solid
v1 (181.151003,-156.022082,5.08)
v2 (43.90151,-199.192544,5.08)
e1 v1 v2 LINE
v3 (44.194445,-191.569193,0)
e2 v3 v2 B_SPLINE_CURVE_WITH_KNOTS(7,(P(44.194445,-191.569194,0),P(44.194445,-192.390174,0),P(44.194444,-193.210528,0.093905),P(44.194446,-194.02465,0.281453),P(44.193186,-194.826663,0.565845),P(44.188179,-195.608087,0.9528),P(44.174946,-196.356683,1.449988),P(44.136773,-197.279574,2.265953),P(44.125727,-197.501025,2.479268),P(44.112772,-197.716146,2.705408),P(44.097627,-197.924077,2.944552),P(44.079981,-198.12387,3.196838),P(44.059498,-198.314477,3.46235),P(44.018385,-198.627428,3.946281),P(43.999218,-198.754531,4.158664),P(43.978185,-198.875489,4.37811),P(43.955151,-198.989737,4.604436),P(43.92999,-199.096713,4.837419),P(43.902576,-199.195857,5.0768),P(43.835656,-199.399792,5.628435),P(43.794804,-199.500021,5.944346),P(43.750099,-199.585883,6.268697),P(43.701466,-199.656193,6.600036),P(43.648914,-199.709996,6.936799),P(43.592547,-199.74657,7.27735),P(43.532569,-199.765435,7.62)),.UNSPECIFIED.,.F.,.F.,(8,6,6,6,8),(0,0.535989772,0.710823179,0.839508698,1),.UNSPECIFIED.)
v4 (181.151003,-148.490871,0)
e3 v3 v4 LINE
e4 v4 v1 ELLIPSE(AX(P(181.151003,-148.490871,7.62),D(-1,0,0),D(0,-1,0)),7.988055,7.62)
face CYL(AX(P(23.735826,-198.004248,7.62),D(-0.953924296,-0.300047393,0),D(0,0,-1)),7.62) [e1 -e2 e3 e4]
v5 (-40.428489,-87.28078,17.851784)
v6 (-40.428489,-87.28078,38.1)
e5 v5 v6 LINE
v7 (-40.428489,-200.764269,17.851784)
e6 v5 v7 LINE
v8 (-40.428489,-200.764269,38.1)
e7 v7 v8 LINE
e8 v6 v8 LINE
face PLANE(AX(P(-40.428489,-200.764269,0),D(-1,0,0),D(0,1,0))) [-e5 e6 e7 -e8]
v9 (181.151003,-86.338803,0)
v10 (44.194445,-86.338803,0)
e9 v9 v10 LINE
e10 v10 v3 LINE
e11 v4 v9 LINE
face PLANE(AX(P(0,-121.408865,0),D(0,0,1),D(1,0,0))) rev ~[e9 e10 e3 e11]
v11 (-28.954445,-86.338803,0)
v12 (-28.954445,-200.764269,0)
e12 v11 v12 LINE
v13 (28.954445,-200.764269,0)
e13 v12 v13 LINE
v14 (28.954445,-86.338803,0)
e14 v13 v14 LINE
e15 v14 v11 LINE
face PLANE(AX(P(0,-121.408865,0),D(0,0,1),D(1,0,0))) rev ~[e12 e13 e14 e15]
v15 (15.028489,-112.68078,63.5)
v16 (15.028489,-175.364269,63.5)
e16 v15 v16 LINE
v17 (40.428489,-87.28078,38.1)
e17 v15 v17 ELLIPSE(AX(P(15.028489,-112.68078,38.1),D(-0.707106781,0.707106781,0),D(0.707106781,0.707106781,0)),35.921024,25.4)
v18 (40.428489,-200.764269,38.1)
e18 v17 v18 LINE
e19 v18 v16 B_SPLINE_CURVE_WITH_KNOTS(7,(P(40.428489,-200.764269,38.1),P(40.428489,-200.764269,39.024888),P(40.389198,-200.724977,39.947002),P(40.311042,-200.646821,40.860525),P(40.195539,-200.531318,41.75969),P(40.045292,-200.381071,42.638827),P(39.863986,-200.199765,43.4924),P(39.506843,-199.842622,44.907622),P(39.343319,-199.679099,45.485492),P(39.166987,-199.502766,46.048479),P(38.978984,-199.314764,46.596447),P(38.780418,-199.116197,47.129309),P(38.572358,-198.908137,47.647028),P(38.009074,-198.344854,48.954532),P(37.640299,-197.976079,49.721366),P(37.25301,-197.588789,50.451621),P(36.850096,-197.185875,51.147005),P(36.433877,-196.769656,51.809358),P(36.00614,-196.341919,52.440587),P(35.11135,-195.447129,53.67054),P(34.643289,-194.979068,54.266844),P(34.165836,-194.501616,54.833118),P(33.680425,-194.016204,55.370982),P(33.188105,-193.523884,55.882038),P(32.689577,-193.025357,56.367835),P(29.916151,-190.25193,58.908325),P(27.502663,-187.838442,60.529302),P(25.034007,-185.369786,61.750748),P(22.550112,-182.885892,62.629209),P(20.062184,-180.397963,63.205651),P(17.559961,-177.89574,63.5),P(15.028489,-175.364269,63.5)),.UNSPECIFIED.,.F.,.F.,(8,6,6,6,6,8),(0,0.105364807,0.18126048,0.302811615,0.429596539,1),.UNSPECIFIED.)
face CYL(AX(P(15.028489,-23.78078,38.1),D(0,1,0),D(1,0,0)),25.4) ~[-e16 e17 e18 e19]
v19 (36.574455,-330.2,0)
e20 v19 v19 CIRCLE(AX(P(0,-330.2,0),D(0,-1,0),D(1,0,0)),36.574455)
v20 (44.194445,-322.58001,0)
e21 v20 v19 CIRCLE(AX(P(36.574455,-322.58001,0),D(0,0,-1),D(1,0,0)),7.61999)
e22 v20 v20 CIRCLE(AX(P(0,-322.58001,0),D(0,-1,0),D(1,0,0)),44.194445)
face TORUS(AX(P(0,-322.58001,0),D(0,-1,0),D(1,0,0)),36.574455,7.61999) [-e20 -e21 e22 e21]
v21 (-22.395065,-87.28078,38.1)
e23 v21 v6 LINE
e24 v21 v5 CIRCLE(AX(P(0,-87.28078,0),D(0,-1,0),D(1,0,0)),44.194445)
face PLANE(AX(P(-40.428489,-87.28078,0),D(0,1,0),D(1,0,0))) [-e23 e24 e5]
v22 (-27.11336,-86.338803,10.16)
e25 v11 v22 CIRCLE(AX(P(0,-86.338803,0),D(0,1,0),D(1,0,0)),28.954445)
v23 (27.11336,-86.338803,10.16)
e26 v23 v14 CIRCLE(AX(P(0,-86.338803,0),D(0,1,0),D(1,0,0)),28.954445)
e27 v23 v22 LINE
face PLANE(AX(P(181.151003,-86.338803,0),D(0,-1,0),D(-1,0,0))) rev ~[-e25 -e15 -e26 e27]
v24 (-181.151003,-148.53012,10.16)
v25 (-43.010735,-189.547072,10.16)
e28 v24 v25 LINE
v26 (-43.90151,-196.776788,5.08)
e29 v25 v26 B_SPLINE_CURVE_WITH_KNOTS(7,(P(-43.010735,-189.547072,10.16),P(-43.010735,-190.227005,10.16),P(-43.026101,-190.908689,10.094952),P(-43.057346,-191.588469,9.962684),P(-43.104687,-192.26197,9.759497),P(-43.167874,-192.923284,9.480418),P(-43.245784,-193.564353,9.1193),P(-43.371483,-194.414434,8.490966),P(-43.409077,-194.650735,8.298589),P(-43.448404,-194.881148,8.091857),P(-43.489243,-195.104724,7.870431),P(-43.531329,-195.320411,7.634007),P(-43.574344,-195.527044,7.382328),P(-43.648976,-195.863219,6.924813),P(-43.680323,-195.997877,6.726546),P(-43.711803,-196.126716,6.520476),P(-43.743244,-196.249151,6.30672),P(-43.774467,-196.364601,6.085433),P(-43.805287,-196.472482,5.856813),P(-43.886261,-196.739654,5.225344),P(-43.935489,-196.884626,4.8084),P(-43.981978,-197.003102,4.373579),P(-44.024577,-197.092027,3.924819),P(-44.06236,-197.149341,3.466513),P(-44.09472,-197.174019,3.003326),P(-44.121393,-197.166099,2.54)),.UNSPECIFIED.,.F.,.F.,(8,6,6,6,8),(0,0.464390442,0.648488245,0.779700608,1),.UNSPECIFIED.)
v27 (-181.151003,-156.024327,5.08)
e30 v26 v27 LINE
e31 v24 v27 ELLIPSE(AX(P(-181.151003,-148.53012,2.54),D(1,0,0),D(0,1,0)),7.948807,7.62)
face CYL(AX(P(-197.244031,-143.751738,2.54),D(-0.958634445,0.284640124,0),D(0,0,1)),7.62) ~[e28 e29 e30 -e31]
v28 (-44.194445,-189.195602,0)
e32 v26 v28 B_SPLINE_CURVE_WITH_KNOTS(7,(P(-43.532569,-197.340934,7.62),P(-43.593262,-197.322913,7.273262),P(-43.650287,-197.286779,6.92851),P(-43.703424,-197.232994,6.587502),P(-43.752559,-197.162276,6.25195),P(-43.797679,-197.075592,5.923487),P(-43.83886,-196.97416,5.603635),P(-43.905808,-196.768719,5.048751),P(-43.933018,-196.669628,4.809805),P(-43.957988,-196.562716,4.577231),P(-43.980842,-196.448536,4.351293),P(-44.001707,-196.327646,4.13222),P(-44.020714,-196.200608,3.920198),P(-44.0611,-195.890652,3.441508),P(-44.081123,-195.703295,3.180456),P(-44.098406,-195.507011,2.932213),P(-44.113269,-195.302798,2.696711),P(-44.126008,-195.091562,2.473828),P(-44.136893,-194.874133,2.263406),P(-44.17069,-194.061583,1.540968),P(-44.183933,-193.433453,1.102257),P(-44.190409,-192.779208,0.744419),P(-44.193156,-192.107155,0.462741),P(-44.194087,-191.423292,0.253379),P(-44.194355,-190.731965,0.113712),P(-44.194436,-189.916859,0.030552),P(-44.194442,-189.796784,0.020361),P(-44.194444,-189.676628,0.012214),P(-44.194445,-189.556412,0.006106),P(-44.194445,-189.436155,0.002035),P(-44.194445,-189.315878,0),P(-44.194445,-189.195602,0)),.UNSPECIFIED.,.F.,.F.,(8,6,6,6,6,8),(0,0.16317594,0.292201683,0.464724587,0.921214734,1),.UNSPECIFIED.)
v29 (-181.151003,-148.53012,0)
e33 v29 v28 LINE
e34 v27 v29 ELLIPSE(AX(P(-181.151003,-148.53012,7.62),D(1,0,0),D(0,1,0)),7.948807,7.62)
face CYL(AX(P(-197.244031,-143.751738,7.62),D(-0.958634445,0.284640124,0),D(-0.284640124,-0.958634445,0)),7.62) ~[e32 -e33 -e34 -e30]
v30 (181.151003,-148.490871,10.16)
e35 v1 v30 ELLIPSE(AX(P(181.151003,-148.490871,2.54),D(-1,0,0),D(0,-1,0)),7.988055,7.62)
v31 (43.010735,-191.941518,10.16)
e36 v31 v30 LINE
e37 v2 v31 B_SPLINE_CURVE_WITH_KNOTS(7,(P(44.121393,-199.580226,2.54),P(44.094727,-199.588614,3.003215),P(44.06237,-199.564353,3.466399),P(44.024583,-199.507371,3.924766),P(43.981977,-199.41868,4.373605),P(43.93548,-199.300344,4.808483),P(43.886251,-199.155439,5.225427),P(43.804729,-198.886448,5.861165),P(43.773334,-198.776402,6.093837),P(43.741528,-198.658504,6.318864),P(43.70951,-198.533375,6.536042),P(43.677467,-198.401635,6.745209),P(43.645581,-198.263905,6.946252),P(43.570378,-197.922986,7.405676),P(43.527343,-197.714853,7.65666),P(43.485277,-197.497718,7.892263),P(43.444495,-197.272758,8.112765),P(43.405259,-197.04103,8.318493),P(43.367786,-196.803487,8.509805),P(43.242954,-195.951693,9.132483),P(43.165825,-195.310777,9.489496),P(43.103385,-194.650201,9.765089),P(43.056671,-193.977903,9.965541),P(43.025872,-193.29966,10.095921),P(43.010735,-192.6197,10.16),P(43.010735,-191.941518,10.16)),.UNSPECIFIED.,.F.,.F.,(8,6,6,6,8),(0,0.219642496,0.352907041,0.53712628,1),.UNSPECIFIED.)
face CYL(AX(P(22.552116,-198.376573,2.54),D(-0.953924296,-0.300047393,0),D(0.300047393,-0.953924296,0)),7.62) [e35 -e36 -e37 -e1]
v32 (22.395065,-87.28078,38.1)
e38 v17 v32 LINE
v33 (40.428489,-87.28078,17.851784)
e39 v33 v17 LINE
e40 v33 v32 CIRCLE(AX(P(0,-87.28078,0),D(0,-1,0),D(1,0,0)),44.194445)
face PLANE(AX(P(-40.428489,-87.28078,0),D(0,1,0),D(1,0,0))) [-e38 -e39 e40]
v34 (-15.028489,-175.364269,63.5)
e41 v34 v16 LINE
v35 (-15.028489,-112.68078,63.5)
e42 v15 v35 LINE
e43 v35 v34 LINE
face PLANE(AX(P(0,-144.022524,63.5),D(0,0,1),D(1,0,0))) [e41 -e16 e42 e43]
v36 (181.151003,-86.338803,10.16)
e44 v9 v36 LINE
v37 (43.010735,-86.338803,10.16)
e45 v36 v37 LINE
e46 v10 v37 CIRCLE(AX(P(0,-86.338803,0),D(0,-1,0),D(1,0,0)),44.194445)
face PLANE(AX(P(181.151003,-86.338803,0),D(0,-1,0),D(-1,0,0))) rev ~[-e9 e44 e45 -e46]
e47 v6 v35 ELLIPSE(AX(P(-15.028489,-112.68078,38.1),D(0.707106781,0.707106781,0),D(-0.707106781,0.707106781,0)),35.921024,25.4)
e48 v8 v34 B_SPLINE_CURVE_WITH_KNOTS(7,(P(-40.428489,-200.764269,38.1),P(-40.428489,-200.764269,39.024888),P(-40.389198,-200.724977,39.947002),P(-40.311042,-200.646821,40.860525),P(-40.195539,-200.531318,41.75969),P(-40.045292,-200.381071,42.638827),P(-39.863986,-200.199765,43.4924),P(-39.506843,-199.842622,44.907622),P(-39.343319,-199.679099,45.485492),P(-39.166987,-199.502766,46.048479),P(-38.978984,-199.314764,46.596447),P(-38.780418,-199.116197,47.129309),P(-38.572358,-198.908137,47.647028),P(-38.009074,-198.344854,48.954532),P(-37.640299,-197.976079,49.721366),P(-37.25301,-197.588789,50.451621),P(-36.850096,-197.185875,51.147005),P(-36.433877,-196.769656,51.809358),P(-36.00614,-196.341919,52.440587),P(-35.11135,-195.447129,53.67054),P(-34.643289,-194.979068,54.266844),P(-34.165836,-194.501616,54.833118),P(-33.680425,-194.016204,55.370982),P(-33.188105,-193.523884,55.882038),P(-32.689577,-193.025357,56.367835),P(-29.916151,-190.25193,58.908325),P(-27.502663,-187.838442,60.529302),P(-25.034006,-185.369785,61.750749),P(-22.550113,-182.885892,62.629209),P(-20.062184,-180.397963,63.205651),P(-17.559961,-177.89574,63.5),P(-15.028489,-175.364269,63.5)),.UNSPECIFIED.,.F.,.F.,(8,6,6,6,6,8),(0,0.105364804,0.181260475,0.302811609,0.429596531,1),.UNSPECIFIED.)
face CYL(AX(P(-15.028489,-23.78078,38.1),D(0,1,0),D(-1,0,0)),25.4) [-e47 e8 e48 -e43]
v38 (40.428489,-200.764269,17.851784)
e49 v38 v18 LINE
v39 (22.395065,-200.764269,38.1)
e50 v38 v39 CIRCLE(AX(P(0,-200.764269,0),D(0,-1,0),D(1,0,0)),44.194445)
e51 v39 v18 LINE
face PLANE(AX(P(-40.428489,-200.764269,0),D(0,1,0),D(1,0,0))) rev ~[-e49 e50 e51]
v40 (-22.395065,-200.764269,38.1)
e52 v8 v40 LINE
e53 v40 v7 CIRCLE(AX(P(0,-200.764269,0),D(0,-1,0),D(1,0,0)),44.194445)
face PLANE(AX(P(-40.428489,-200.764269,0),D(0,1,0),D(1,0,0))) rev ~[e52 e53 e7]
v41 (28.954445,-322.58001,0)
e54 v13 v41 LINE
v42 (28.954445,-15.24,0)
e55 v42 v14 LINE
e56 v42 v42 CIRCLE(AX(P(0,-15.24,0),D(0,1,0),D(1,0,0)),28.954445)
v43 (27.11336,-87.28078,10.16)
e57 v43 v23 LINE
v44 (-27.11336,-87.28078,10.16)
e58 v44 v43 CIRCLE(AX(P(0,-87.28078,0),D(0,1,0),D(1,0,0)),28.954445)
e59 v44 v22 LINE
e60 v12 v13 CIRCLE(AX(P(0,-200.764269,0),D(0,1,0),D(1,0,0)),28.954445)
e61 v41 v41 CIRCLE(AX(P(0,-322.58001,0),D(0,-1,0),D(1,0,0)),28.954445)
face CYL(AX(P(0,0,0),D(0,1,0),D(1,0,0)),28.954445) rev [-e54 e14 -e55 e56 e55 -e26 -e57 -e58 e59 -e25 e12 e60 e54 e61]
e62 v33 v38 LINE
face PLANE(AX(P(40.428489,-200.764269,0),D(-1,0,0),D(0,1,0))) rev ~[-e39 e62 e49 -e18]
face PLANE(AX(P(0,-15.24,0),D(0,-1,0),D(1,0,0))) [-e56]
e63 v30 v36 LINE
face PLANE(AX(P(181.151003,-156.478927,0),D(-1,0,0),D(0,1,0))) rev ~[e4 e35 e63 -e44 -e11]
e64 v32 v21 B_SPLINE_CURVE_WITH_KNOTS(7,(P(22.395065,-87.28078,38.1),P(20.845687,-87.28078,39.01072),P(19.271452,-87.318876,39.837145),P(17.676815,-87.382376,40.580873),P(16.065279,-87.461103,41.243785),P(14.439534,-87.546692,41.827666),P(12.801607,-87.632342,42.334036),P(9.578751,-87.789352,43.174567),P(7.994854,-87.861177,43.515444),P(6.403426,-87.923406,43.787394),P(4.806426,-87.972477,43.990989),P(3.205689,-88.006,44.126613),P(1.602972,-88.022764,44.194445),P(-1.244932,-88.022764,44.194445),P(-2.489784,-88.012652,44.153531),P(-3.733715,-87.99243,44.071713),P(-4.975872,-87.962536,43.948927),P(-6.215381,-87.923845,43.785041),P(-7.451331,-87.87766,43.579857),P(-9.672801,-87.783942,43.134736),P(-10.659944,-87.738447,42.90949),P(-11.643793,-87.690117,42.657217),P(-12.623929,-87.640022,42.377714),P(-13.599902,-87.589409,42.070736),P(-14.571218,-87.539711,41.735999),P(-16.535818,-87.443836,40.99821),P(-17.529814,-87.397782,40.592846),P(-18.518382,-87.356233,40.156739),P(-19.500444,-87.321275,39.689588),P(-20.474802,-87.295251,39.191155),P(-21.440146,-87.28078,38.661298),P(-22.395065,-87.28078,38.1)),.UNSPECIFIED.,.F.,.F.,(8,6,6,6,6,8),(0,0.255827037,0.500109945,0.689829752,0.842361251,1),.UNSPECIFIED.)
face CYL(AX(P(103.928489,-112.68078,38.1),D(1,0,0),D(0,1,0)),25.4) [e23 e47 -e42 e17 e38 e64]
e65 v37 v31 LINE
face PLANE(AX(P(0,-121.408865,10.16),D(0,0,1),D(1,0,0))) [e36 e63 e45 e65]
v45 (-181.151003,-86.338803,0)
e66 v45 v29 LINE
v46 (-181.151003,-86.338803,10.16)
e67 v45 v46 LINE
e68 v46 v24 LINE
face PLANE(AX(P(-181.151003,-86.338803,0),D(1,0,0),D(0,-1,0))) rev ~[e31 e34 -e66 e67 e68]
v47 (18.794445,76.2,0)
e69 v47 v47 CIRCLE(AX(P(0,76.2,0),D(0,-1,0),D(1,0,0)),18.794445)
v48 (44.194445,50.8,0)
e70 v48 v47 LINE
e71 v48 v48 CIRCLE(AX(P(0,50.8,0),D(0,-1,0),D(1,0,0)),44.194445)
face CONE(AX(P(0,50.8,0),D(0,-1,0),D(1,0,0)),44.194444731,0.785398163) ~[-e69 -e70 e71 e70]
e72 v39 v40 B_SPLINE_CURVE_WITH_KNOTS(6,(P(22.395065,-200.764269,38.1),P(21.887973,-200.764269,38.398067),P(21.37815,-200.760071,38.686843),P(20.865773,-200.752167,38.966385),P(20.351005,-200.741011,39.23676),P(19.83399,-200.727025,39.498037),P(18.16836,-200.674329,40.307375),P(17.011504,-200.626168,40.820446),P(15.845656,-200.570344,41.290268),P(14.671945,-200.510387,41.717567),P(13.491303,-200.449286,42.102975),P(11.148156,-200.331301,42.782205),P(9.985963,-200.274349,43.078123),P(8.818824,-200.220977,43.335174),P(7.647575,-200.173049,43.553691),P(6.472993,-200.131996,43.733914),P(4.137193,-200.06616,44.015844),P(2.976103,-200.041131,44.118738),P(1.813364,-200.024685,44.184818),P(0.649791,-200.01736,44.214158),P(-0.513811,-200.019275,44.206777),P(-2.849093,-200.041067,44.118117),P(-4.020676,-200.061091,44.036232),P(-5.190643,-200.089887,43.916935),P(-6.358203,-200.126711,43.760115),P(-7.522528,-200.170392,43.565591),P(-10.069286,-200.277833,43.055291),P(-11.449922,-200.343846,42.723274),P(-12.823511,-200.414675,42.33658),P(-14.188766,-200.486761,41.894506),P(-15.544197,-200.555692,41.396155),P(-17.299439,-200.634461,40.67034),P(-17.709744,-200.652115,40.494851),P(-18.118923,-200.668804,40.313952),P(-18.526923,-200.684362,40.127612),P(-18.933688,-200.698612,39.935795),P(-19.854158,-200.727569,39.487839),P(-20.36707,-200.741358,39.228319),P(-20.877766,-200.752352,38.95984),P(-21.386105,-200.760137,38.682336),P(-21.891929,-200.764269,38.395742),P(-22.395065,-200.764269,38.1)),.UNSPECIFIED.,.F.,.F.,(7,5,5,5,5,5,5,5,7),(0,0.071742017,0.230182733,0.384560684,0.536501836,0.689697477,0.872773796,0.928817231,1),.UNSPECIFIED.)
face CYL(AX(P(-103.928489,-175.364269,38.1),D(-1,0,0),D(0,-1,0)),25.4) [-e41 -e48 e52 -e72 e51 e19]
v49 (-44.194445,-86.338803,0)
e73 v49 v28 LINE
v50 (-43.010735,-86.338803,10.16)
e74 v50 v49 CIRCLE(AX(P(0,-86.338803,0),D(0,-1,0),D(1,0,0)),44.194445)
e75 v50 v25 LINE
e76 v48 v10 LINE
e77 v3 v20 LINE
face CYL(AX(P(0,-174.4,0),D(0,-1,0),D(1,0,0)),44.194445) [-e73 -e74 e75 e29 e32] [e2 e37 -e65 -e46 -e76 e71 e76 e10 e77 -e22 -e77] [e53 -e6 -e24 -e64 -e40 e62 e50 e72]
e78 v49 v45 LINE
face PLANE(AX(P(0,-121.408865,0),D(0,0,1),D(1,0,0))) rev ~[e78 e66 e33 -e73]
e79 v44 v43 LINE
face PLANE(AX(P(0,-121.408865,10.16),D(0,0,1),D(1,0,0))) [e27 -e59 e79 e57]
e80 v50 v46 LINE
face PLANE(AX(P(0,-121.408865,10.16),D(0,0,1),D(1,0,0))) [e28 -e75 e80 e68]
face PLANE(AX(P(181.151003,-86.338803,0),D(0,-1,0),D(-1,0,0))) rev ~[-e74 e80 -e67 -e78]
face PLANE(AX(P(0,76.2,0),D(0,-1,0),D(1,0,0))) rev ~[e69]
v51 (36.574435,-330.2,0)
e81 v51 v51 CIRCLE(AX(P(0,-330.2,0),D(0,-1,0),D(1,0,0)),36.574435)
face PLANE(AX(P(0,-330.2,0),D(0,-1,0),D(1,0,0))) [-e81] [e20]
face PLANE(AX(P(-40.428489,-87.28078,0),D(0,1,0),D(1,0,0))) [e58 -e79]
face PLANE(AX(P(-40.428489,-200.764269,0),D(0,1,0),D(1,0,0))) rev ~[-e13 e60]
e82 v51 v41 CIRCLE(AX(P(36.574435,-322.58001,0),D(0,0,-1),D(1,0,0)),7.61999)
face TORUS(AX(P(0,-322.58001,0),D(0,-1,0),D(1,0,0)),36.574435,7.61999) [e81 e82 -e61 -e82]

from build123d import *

# Parameters (mm, degrees)
F0_R          = 44.1944447312
F1_DEPTH      = 330.2
F2_T          = -15.24
F3_R          = 7.61999
F4_DEPTH      = 76.2
F5_SIZE       = 25.4
F6_W          = 80.8569788933
F6_H          = 113.4834885597
F7_DEPTH      = 63.5
F8_T1_DEPTH   = 240.4834885597
F8_T6_DEPTH   = 207.8569788933
F8_S7_R       = 44.1944447312
F8_T8_DEPTH   = 107
F8_T12_DEPTH  = 207.8569788933
F8_S13_R      = 44.1944447312
F8_T14_DEPTH  = 107
F10_DEPTH     = 10.16
F11_T4_DEPTH  = 181.6717263284
F11_S5_R      = 44.1944447312
F11_T6_DEPTH  = 95
F11_T10_DEPTH = 182.9126104381
F11_S11_R     = 44.1944447312
F11_T12_DEPTH = 95
F11_T16_DEPTH = 182.201088869
F11_S17_R     = 44.1944447312
F11_T18_DEPTH = 95
F11_T22_DEPTH = 180.9663017132
F11_S23_R     = 44.1944447312
F11_T24_DEPTH = 94


# Not quite as in the source:
# - a fillet or chamfer that OpenCascade refuses, or shapes differently, is made with other operations: its cross-section is extruded or revolved along the edge and cut away or added
# - a fillet or chamfer is up to 0.001 mm smaller than in the source, because OpenCascade refuses the exact size


with BuildPart() as f1:
    # F0 (on Front) → F1 (new body)
    with BuildSketch(Plane.XZ):
        Circle(F0_R)
    extrude(amount=F1_DEPTH)

    # F2
    f2_openings = [f1.faces().sort_by_distance(p)[0] for p in [
        (0, -330.2, 0),
    ]]
    offset(amount=F2_T, openings=f2_openings)

    # F3 (radius 7.62 in the source; OpenCascade refuses exactly that, so slightly less here)
    f3_edges = [f1.edges().sort_by_distance(p)[0] for p in [
        (-44.194445, -330.2, 0),
        (-28.954445, -330.2, 0),
    ]]
    fillet(f3_edges, radius=F3_R)

    # F4 (add): a face of the model
    f4_faces = [f1.faces().sort_by_distance(p)[0] for p in [
        (0, 0, 0),
    ]]
    extrude(f4_faces, amount=F4_DEPTH)

    # F5
    f5_edges = [f1.edges().sort_by_distance(p)[0] for p in [
        (-44.194445, 76.2, 0),
    ]]
    chamfer(f5_edges, length=F5_SIZE)

    # F6 (on Top) → F7 (join)
    with BuildSketch(Plane.XY):
        with Locations((0, -144.0225243568)):
            Rectangle(F6_W, F6_H)
    extrude(amount=F7_DEPTH)

    # F8: fillet of radius 25.4 on 4 edges, made by hand

    # F8_s2 → F8_t1 (cut)
    with BuildSketch(Plane.XZ.offset(23.780780077)):
        with BuildLine():
            ThreePointArc((40.4284894466, 38.1), (32.9890016888, 56.0605122421), (15.0284894466, 63.5))
            Line((15.0284894466, 63.5), (40.4284894466, 63.5))
            Line((40.4284894466, 63.5), (40.4284894466, 38.1))
        make_face()
        with BuildLine():
            ThreePointArc((-40.4284894466, 38.1), (-32.9890016888, 56.0605122421), (-15.0284894466, 63.5))
            Line((-15.0284894466, 63.5), (-40.4284894466, 63.5))
            Line((-40.4284894466, 63.5), (-40.4284894466, 38.1))
        make_face()
    extrude(amount=F8_T1_DEPTH, mode=Mode.SUBTRACT)


with BuildPart() as f8_tool4:
    # F8_s5 → F8_t6 (new body)
    with BuildSketch(Plane.YZ.offset(103.9284894466)):
        with BuildLine():
            ThreePointArc((-87.280780077, 38.1), (-94.7202678348, 56.0605122421), (-112.680780077, 63.5))
            Line((-112.680780077, 63.5), (-87.280780077, 63.5))
            Line((-87.280780077, 63.5), (-87.280780077, 38.1))
        make_face()
    extrude(amount=-F8_T6_DEPTH)

    # F8_s7 → F8_t8 (cut, symmetric)
    with BuildSketch(Plane.XZ.offset(100)):
        Circle(F8_S7_R)
    extrude(amount=F8_T8_DEPTH, both=True, mode=Mode.SUBTRACT)


with BuildPart() as f1_1:
    add(f1.part)

    # F8_t3: cut F8_tool4
    add(f8_tool4.part, mode=Mode.SUBTRACT)


with BuildPart() as f8_tool10:
    # F8_s11 → F8_t12 (new body)
    with BuildSketch(Plane.YZ.offset(-103.9284894466)):
        with BuildLine():
            ThreePointArc((-200.7642686367, 38.1), (-193.3247808788, 56.0605122421), (-175.3642686367, 63.5))
            Line((-175.3642686367, 63.5), (-200.7642686367, 63.5))
            Line((-200.7642686367, 63.5), (-200.7642686367, 38.1))
        make_face()
    extrude(amount=F8_T12_DEPTH)

    # F8_s13 → F8_t14 (cut, symmetric)
    with BuildSketch(Plane.XZ.offset(188.1)):
        Circle(F8_S13_R)
    extrude(amount=F8_T14_DEPTH, both=True, mode=Mode.SUBTRACT)


with BuildPart() as f1_2:
    add(f1_1.part)

    # F8_t9: cut F8_tool10
    add(f8_tool10.part, mode=Mode.SUBTRACT)

    # F9 (on Top) → F10 (join)
    with BuildSketch(Plane.XY):
        Polygon((181.1510026455, -156.4789265394), (181.1510026455, -86.3388031721), (-181.1510026455, -86.3388031721), (-181.1510026455, -156.4789265394), (-40.541768074, -156.4789265394), (40.4533445835, -156.4789265394), align=None)
        Polygon((40.4533445835, -200.733974576), (181.1510026455, -156.4789265394), (40.4533445835, -156.4789265394), align=None)
        Polygon((-40.541768074, -156.4789265394), (-181.1510026455, -156.4789265394), (-40.541768074, -198.22897017), align=None)
    extrude(amount=F10_DEPTH)

    # F11: fillet of radius 7.62 on 4 edges, made by hand


with BuildPart() as f11_tool2:
    # F11_s3 → F11_t4 (new body)
    with BuildSketch(Plane(origin=(-35.0743442089, -11.0322858902, 0), x_dir=(0, 0, 1), z_dir=(0.9539242957, 0.3000473932, 0))):
        with BuildLine():
            ThreePointArc((0, 196.0029358997), (2.2318463274, 201.3910895724), (7.62, 203.6229358997))
            Line((7.62, 203.6229358997), (0, 203.6229358997))
            Line((0, 203.6229358997), (0, 196.0029358997))
        make_face()
    extrude(amount=F11_T4_DEPTH)

    # F11_s5 → F11_t6 (cut, symmetric)
    with BuildSketch(Plane.XZ.offset(174.4)):
        Circle(F11_S5_R)
    extrude(amount=F11_T6_DEPTH, both=True, mode=Mode.SUBTRACT)


with BuildPart() as f1_3:
    add(f1_2.part)

    # F11_t1: cut F11_tool2
    add(f11_tool2.part, mode=Mode.SUBTRACT)


with BuildPart() as f11_tool8:
    # F11_s9 → F11_t10 (new body)
    with BuildSketch(Plane(origin=(-36.2580537092, -11.4046099325, 0), x_dir=(0, 0, 1), z_dir=(0.9539242957, 0.3000473932, 0))):
        with BuildLine():
            ThreePointArc((2.54, 203.6229358997), (7.9281536726, 201.3910895724), (10.16, 196.0029358997))
            Line((10.16, 196.0029358997), (10.16, 203.6229358997))
            Line((10.16, 203.6229358997), (2.54, 203.6229358997))
        make_face()
    extrude(amount=F11_T10_DEPTH)

    # F11_s11 → F11_t12 (cut, symmetric)
    with BuildSketch(Plane.XZ.offset(174.6)):
        Circle(F11_S11_R)
    extrude(amount=F11_T12_DEPTH, both=True, mode=Mode.SUBTRACT)


with BuildPart() as f1_4:
    add(f1_3.part)

    # F11_t7: cut F11_tool8
    add(f11_tool8.part, mode=Mode.SUBTRACT)


with BuildPart() as f11_tool14:
    # F11_s15 → F11_t16 (new body)
    with BuildSketch(Plane(origin=(-142.0383828725, 42.1743898985, 0), x_dir=(0, 0, 1), z_dir=(0.9586344454, -0.2846401237, 0))):
        with BuildLine():
            ThreePointArc((10.16, 193.9489327682), (7.9281536726, 199.3370864408), (2.54, 201.5689327682))
            Line((2.54, 201.5689327682), (10.16, 201.5689327682))
            Line((10.16, 201.5689327682), (10.16, 193.9489327682))
        make_face()
    extrude(amount=F11_T16_DEPTH)

    # F11_s17 → F11_t18 (cut, symmetric)
    with BuildSketch(Plane.XZ.offset(173.3)):
        Circle(F11_S17_R)
    extrude(amount=F11_T18_DEPTH, both=True, mode=Mode.SUBTRACT)


with BuildPart() as f1_5:
    add(f1_4.part)

    # F11_t13: cut F11_tool14
    add(f11_tool14.part, mode=Mode.SUBTRACT)


with BuildPart() as f11_tool20:
    # F11_s21 → F11_t22 (new body)
    with BuildSketch(Plane(origin=(-142.0383828725, 42.1743898985, 0), x_dir=(0, 0, 1), z_dir=(0.9586344454, -0.2846401237, 0))):
        with BuildLine():
            ThreePointArc((7.62, 201.5689327682), (2.2318463274, 199.3370864408), (0, 193.9489327682))
            Line((0, 193.9489327682), (0, 201.5689327682))
            Line((0, 201.5689327682), (7.62, 201.5689327682))
        make_face()
    extrude(amount=F11_T22_DEPTH)

    # F11_s23 → F11_t24 (cut, symmetric)
    with BuildSketch(Plane.XZ.offset(173.2)):
        Circle(F11_S23_R)
    extrude(amount=F11_T24_DEPTH, both=True, mode=Mode.SUBTRACT)


with BuildPart() as f1_6:
    add(f1_5.part)

    # F11_t19: cut F11_tool20
    add(f11_tool20.part, mode=Mode.SUBTRACT)


solid = f1_6.part
